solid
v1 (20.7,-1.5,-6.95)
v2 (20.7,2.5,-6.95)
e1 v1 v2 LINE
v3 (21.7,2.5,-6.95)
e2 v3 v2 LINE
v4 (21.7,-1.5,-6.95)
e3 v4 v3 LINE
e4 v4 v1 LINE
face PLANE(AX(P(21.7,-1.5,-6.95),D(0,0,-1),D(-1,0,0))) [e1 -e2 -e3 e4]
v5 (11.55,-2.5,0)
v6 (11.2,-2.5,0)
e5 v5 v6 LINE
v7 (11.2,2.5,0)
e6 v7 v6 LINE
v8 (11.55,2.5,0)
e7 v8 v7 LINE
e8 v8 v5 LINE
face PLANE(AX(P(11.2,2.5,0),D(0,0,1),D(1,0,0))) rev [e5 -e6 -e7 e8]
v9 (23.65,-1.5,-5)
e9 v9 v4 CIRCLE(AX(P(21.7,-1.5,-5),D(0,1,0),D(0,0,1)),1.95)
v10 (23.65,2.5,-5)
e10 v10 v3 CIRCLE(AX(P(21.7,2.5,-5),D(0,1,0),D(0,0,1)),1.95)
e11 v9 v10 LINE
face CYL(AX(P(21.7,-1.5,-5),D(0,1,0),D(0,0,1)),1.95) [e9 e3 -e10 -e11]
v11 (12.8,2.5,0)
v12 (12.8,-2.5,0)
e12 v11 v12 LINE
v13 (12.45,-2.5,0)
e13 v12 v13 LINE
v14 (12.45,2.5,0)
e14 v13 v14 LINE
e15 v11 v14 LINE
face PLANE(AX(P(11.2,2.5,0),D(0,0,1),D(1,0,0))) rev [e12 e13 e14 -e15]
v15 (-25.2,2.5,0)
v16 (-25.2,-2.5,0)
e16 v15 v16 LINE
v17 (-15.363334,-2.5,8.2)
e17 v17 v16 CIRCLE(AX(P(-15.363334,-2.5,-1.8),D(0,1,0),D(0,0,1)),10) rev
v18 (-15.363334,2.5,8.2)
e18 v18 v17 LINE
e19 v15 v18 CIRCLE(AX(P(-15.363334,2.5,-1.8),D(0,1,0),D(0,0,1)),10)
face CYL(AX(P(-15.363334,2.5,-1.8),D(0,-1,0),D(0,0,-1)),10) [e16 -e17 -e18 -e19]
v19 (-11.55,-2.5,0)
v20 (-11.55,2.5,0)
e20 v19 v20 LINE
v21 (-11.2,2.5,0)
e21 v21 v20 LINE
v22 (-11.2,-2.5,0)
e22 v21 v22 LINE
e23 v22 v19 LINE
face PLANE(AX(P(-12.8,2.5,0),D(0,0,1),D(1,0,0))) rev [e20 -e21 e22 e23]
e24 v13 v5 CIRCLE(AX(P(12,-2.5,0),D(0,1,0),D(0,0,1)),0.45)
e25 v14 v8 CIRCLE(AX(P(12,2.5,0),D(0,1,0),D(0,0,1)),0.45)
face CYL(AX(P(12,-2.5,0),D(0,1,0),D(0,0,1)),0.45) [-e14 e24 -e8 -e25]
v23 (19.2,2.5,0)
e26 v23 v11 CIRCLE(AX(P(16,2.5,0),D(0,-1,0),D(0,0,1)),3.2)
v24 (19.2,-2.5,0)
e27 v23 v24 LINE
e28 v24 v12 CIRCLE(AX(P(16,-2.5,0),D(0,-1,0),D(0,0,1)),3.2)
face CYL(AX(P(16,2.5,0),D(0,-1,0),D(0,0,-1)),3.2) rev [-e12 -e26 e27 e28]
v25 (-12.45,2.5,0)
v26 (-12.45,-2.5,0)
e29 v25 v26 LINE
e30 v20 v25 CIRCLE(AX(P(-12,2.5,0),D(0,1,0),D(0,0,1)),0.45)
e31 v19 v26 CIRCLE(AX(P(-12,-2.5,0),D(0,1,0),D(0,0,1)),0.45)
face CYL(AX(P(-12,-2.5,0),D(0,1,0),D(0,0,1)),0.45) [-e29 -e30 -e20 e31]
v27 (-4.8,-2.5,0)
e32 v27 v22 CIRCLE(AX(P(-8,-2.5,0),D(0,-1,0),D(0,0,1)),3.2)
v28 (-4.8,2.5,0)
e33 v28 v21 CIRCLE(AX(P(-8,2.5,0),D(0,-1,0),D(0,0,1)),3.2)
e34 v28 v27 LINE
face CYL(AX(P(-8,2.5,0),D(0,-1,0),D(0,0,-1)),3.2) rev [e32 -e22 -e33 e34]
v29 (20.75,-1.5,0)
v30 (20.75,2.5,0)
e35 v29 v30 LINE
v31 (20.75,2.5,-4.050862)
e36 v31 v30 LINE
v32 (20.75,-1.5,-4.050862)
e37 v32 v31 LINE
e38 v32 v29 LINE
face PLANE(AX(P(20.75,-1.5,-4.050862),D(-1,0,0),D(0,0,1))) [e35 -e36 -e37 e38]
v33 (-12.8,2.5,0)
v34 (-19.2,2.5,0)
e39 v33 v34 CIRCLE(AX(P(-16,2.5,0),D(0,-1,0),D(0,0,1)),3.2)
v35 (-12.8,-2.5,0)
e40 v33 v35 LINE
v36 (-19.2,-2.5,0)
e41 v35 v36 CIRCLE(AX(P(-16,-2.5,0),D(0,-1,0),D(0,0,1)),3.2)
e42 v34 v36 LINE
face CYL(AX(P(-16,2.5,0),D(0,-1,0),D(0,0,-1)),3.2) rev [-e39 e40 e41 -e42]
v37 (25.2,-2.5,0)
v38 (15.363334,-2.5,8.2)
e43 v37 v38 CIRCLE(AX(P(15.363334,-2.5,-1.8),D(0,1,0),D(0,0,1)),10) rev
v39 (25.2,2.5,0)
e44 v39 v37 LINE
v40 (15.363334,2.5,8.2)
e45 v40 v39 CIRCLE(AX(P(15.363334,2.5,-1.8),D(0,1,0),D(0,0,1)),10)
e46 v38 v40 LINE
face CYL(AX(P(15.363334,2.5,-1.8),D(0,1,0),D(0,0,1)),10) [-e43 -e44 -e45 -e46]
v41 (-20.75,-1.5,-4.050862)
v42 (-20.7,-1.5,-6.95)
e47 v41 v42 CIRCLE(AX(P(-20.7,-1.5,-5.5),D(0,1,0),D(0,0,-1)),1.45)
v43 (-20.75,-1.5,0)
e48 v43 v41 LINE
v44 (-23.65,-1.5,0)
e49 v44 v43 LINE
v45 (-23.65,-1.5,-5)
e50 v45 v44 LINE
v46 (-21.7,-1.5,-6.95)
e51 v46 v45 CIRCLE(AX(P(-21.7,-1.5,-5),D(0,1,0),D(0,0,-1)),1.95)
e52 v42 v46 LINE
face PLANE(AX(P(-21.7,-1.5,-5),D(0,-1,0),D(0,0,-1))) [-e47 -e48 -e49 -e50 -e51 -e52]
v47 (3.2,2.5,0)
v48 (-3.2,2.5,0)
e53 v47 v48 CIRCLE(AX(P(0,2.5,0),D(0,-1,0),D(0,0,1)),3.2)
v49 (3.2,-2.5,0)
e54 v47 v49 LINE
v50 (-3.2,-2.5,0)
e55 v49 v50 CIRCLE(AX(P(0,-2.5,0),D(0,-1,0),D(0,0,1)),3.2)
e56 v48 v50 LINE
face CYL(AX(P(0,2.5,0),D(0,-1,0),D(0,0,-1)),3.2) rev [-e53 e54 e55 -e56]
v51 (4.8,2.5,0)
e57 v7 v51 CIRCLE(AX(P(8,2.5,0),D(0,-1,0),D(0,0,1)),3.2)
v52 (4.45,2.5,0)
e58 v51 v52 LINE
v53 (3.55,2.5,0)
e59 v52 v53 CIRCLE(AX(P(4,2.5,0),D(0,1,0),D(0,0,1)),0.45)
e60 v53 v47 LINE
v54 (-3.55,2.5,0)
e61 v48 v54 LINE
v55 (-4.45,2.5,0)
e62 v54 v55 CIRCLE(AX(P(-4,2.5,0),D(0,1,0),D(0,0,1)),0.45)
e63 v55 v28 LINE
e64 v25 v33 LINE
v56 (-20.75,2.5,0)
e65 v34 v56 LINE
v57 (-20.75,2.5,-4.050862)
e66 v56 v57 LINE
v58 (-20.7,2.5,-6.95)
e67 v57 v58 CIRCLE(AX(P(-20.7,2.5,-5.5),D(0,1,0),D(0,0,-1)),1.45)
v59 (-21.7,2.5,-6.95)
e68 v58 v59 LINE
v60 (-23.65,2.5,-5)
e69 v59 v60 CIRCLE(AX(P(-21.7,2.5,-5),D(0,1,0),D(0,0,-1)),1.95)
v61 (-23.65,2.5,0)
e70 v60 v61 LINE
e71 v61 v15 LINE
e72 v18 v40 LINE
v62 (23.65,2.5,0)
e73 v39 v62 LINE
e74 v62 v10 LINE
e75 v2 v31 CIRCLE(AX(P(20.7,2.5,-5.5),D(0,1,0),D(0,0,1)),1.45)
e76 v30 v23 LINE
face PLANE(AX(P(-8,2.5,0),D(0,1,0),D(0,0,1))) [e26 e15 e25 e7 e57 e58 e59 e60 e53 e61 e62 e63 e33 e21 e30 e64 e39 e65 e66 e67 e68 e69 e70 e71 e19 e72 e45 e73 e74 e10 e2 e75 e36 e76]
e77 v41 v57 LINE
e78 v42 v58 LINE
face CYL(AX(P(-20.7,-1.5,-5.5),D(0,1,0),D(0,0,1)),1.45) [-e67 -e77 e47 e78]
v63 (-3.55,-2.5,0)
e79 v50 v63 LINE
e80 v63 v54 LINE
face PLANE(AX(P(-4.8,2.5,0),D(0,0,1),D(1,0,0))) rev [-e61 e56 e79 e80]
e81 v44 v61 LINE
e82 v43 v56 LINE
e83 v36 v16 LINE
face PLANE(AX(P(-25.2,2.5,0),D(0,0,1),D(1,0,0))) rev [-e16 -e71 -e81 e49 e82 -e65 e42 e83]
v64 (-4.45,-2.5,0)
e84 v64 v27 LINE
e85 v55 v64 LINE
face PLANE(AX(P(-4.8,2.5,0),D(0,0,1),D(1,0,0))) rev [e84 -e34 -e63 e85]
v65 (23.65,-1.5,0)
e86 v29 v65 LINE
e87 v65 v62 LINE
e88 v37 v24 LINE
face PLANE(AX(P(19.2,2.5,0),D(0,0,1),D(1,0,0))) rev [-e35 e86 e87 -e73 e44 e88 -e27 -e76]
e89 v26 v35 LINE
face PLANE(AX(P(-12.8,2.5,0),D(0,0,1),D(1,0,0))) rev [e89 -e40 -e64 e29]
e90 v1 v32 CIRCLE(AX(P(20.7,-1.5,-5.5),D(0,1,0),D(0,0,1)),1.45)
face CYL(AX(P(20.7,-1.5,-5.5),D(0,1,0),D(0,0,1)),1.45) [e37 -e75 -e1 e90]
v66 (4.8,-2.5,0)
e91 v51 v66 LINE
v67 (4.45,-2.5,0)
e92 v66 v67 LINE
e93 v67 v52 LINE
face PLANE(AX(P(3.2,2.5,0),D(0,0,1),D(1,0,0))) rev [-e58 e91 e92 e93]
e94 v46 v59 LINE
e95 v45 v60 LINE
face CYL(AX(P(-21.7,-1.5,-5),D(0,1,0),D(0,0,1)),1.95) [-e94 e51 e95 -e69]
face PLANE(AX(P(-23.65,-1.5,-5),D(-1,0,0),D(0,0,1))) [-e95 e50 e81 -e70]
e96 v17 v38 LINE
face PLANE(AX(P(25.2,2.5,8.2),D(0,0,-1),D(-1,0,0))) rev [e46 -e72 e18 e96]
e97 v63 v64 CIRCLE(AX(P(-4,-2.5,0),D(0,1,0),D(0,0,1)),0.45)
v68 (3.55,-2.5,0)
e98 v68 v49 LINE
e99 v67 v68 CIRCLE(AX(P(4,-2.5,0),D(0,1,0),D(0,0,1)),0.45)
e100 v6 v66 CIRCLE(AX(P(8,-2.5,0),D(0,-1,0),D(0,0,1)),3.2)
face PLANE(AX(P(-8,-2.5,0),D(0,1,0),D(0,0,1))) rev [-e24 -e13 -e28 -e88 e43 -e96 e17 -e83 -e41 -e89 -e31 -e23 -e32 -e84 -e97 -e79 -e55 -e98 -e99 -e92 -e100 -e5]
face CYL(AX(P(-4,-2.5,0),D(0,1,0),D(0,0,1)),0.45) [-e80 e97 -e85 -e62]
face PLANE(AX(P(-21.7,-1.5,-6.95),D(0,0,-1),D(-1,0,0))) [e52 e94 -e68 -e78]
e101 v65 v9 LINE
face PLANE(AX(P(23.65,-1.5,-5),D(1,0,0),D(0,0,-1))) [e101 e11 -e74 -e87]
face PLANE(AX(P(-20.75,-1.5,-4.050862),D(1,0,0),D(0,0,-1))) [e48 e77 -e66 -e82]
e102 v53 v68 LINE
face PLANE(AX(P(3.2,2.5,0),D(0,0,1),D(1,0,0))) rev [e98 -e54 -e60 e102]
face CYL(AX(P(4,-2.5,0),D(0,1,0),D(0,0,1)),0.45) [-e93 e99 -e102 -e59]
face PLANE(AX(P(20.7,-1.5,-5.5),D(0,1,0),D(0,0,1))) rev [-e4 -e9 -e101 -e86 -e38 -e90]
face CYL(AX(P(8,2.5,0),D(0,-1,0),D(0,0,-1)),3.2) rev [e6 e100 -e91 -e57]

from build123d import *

# Parameters (mm, degrees)
RESSALTO_EXTRUS_O1_DEPTH = 2.5
RESSALTO_EXTRUS_O2_DEPTH = 4
FILETE1_R                = 10
ESBO_O2_R                = 0.45
RESSALTO_EXTRUS_O3_DEPTH = 5


with BuildPart() as part:
    # Esboço1 → Ressalto-extrusão1 (new, symmetric)
    with BuildSketch(Plane(origin=(0, 0, 0), x_dir=(1, 0, 0), z_dir=(0, 1, 0))):
        with BuildLine():
            Line((-25.2, 0), (-19.2, 0))
            ThreePointArc((-19.2, 0), (-16, -3.2), (-12.8, 0))
            Line((-12.8, 0), (-11.2, 0))
            ThreePointArc((-11.2, 0), (-8, -3.2), (-4.8, 0))
            Line((-4.8, 0), (-3.2, 0))
            ThreePointArc((-3.2, 0), (0, -3.2), (3.2, 0))
            Line((3.2, 0), (4.8, 0))
            ThreePointArc((4.8, 0), (8, -3.2), (11.2, 0))
            Line((11.2, 0), (12.8, 0))
            ThreePointArc((12.8, 0), (16, -3.2), (19.2, 0))
            Line((19.2, 0), (25.2, 0))
            Line((25.2, 0), (25.2, -8.2))
            Line((25.2, -8.2), (-25.2, -8.2))
            Line((-25.2, -8.2), (-25.2, 0))
        make_face()
    extrude(amount=RESSALTO_EXTRUS_O1_DEPTH, both=True)

    # Esboço3 → Ressalto-extrusão2 (add)
    with BuildSketch(Plane(origin=(0, 2.5, 0), x_dir=(1, 0, 0), z_dir=(0, 1, 0))):
        with BuildLine():
            Line((-23.65, 5), (-23.65, 0))
            Line((-23.65, 0), (-20.75, 0))
            Line((-20.75, 0), (-20.75, 4.050862325))
            ThreePointArc((-20.75, 4.050862325), (-19.250215597, 5.474996282), (-20.7, 6.95))
            Line((-20.7, 6.95), (-21.7, 6.95))
            ThreePointArc((-21.7, 6.95), (-23.078858223, 6.378858223), (-23.65, 5))
        make_face()
        with BuildLine():
            Line((23.65, 0), (20.75, 0))
            Line((20.75, 0), (20.75, 4.050862325))
            ThreePointArc((20.75, 4.050862325), (19.250215597, 5.474996282), (20.7, 6.95))
            Line((20.7, 6.95), (21.7, 6.95))
            ThreePointArc((21.7, 6.95), (23.078858223, 6.378858223), (23.65, 5))
            Line((23.65, 5), (23.65, 0))
        make_face()
    extrude(amount=-RESSALTO_EXTRUS_O2_DEPTH)

    # Filete1
    # the kernel refuses this fillet: 10 mm, written as the material it takes off along each edge
    with BuildSketch(Plane(origin=(-25.2, 27.091665255, 8.2), x_dir=(1, 0, 0), z_dir=(0, -1, 0))) as filete1_piece_1:
        with BuildLine():
            CenterArc((9.836666102, -10), FILETE1_R, 90, 79.630240195)
            Line((0, -8.2), (-0.196733322, -8.164))
            ThreePointArc((-0.196733322, -8.164), (-0.2, -4.1), (-0.2, 0))
            Line((-0.2, 0), (0, 0.2))
            Line((0, 0.2), (9.836666102, 0.2))
            Line((9.836666102, 0.2), (9.836666102, 0))
        make_face()
    extrude(amount=54.183330509, mode=Mode.SUBTRACT)
    with BuildSketch(Plane(origin=(25.2, 27.091665255, 8.2), x_dir=(0, 0, -1), z_dir=(0, -1, 0))) as filete1_piece_2:
        with BuildLine():
            CenterArc((10, -9.836666102), FILETE1_R, 100.369759805, 79.630240195)
            Line((0, -9.836666102), (-0.2, -9.836666102))
            Line((-0.2, -9.836666102), (-0.2, 0))
            Line((-0.2, 0), (0, 0.2))
            ThreePointArc((0, 0.2), (4.1, 0.2), (8.164, 0.196733322))
            Line((8.164, 0.196733322), (8.2, 0))
        make_face()
    extrude(amount=54.183330509, mode=Mode.SUBTRACT)

    # Esboço2 → Ressalto-extrusão3 (add, through all)
    with BuildSketch(Plane(origin=(0, 2.5, 0), x_dir=(1, 0, 0), z_dir=(0, 1, 0))):
        with Locations((-12, 0)):
            Circle(ESBO_O2_R)
        with Locations((-4, 0)):
            Circle(ESBO_O2_R)
        with Locations((4, 0)):
            Circle(ESBO_O2_R)
        with Locations((12, 0)):
            Circle(ESBO_O2_R)
    extrude(amount=-RESSALTO_EXTRUS_O3_DEPTH)


solid = part.part
